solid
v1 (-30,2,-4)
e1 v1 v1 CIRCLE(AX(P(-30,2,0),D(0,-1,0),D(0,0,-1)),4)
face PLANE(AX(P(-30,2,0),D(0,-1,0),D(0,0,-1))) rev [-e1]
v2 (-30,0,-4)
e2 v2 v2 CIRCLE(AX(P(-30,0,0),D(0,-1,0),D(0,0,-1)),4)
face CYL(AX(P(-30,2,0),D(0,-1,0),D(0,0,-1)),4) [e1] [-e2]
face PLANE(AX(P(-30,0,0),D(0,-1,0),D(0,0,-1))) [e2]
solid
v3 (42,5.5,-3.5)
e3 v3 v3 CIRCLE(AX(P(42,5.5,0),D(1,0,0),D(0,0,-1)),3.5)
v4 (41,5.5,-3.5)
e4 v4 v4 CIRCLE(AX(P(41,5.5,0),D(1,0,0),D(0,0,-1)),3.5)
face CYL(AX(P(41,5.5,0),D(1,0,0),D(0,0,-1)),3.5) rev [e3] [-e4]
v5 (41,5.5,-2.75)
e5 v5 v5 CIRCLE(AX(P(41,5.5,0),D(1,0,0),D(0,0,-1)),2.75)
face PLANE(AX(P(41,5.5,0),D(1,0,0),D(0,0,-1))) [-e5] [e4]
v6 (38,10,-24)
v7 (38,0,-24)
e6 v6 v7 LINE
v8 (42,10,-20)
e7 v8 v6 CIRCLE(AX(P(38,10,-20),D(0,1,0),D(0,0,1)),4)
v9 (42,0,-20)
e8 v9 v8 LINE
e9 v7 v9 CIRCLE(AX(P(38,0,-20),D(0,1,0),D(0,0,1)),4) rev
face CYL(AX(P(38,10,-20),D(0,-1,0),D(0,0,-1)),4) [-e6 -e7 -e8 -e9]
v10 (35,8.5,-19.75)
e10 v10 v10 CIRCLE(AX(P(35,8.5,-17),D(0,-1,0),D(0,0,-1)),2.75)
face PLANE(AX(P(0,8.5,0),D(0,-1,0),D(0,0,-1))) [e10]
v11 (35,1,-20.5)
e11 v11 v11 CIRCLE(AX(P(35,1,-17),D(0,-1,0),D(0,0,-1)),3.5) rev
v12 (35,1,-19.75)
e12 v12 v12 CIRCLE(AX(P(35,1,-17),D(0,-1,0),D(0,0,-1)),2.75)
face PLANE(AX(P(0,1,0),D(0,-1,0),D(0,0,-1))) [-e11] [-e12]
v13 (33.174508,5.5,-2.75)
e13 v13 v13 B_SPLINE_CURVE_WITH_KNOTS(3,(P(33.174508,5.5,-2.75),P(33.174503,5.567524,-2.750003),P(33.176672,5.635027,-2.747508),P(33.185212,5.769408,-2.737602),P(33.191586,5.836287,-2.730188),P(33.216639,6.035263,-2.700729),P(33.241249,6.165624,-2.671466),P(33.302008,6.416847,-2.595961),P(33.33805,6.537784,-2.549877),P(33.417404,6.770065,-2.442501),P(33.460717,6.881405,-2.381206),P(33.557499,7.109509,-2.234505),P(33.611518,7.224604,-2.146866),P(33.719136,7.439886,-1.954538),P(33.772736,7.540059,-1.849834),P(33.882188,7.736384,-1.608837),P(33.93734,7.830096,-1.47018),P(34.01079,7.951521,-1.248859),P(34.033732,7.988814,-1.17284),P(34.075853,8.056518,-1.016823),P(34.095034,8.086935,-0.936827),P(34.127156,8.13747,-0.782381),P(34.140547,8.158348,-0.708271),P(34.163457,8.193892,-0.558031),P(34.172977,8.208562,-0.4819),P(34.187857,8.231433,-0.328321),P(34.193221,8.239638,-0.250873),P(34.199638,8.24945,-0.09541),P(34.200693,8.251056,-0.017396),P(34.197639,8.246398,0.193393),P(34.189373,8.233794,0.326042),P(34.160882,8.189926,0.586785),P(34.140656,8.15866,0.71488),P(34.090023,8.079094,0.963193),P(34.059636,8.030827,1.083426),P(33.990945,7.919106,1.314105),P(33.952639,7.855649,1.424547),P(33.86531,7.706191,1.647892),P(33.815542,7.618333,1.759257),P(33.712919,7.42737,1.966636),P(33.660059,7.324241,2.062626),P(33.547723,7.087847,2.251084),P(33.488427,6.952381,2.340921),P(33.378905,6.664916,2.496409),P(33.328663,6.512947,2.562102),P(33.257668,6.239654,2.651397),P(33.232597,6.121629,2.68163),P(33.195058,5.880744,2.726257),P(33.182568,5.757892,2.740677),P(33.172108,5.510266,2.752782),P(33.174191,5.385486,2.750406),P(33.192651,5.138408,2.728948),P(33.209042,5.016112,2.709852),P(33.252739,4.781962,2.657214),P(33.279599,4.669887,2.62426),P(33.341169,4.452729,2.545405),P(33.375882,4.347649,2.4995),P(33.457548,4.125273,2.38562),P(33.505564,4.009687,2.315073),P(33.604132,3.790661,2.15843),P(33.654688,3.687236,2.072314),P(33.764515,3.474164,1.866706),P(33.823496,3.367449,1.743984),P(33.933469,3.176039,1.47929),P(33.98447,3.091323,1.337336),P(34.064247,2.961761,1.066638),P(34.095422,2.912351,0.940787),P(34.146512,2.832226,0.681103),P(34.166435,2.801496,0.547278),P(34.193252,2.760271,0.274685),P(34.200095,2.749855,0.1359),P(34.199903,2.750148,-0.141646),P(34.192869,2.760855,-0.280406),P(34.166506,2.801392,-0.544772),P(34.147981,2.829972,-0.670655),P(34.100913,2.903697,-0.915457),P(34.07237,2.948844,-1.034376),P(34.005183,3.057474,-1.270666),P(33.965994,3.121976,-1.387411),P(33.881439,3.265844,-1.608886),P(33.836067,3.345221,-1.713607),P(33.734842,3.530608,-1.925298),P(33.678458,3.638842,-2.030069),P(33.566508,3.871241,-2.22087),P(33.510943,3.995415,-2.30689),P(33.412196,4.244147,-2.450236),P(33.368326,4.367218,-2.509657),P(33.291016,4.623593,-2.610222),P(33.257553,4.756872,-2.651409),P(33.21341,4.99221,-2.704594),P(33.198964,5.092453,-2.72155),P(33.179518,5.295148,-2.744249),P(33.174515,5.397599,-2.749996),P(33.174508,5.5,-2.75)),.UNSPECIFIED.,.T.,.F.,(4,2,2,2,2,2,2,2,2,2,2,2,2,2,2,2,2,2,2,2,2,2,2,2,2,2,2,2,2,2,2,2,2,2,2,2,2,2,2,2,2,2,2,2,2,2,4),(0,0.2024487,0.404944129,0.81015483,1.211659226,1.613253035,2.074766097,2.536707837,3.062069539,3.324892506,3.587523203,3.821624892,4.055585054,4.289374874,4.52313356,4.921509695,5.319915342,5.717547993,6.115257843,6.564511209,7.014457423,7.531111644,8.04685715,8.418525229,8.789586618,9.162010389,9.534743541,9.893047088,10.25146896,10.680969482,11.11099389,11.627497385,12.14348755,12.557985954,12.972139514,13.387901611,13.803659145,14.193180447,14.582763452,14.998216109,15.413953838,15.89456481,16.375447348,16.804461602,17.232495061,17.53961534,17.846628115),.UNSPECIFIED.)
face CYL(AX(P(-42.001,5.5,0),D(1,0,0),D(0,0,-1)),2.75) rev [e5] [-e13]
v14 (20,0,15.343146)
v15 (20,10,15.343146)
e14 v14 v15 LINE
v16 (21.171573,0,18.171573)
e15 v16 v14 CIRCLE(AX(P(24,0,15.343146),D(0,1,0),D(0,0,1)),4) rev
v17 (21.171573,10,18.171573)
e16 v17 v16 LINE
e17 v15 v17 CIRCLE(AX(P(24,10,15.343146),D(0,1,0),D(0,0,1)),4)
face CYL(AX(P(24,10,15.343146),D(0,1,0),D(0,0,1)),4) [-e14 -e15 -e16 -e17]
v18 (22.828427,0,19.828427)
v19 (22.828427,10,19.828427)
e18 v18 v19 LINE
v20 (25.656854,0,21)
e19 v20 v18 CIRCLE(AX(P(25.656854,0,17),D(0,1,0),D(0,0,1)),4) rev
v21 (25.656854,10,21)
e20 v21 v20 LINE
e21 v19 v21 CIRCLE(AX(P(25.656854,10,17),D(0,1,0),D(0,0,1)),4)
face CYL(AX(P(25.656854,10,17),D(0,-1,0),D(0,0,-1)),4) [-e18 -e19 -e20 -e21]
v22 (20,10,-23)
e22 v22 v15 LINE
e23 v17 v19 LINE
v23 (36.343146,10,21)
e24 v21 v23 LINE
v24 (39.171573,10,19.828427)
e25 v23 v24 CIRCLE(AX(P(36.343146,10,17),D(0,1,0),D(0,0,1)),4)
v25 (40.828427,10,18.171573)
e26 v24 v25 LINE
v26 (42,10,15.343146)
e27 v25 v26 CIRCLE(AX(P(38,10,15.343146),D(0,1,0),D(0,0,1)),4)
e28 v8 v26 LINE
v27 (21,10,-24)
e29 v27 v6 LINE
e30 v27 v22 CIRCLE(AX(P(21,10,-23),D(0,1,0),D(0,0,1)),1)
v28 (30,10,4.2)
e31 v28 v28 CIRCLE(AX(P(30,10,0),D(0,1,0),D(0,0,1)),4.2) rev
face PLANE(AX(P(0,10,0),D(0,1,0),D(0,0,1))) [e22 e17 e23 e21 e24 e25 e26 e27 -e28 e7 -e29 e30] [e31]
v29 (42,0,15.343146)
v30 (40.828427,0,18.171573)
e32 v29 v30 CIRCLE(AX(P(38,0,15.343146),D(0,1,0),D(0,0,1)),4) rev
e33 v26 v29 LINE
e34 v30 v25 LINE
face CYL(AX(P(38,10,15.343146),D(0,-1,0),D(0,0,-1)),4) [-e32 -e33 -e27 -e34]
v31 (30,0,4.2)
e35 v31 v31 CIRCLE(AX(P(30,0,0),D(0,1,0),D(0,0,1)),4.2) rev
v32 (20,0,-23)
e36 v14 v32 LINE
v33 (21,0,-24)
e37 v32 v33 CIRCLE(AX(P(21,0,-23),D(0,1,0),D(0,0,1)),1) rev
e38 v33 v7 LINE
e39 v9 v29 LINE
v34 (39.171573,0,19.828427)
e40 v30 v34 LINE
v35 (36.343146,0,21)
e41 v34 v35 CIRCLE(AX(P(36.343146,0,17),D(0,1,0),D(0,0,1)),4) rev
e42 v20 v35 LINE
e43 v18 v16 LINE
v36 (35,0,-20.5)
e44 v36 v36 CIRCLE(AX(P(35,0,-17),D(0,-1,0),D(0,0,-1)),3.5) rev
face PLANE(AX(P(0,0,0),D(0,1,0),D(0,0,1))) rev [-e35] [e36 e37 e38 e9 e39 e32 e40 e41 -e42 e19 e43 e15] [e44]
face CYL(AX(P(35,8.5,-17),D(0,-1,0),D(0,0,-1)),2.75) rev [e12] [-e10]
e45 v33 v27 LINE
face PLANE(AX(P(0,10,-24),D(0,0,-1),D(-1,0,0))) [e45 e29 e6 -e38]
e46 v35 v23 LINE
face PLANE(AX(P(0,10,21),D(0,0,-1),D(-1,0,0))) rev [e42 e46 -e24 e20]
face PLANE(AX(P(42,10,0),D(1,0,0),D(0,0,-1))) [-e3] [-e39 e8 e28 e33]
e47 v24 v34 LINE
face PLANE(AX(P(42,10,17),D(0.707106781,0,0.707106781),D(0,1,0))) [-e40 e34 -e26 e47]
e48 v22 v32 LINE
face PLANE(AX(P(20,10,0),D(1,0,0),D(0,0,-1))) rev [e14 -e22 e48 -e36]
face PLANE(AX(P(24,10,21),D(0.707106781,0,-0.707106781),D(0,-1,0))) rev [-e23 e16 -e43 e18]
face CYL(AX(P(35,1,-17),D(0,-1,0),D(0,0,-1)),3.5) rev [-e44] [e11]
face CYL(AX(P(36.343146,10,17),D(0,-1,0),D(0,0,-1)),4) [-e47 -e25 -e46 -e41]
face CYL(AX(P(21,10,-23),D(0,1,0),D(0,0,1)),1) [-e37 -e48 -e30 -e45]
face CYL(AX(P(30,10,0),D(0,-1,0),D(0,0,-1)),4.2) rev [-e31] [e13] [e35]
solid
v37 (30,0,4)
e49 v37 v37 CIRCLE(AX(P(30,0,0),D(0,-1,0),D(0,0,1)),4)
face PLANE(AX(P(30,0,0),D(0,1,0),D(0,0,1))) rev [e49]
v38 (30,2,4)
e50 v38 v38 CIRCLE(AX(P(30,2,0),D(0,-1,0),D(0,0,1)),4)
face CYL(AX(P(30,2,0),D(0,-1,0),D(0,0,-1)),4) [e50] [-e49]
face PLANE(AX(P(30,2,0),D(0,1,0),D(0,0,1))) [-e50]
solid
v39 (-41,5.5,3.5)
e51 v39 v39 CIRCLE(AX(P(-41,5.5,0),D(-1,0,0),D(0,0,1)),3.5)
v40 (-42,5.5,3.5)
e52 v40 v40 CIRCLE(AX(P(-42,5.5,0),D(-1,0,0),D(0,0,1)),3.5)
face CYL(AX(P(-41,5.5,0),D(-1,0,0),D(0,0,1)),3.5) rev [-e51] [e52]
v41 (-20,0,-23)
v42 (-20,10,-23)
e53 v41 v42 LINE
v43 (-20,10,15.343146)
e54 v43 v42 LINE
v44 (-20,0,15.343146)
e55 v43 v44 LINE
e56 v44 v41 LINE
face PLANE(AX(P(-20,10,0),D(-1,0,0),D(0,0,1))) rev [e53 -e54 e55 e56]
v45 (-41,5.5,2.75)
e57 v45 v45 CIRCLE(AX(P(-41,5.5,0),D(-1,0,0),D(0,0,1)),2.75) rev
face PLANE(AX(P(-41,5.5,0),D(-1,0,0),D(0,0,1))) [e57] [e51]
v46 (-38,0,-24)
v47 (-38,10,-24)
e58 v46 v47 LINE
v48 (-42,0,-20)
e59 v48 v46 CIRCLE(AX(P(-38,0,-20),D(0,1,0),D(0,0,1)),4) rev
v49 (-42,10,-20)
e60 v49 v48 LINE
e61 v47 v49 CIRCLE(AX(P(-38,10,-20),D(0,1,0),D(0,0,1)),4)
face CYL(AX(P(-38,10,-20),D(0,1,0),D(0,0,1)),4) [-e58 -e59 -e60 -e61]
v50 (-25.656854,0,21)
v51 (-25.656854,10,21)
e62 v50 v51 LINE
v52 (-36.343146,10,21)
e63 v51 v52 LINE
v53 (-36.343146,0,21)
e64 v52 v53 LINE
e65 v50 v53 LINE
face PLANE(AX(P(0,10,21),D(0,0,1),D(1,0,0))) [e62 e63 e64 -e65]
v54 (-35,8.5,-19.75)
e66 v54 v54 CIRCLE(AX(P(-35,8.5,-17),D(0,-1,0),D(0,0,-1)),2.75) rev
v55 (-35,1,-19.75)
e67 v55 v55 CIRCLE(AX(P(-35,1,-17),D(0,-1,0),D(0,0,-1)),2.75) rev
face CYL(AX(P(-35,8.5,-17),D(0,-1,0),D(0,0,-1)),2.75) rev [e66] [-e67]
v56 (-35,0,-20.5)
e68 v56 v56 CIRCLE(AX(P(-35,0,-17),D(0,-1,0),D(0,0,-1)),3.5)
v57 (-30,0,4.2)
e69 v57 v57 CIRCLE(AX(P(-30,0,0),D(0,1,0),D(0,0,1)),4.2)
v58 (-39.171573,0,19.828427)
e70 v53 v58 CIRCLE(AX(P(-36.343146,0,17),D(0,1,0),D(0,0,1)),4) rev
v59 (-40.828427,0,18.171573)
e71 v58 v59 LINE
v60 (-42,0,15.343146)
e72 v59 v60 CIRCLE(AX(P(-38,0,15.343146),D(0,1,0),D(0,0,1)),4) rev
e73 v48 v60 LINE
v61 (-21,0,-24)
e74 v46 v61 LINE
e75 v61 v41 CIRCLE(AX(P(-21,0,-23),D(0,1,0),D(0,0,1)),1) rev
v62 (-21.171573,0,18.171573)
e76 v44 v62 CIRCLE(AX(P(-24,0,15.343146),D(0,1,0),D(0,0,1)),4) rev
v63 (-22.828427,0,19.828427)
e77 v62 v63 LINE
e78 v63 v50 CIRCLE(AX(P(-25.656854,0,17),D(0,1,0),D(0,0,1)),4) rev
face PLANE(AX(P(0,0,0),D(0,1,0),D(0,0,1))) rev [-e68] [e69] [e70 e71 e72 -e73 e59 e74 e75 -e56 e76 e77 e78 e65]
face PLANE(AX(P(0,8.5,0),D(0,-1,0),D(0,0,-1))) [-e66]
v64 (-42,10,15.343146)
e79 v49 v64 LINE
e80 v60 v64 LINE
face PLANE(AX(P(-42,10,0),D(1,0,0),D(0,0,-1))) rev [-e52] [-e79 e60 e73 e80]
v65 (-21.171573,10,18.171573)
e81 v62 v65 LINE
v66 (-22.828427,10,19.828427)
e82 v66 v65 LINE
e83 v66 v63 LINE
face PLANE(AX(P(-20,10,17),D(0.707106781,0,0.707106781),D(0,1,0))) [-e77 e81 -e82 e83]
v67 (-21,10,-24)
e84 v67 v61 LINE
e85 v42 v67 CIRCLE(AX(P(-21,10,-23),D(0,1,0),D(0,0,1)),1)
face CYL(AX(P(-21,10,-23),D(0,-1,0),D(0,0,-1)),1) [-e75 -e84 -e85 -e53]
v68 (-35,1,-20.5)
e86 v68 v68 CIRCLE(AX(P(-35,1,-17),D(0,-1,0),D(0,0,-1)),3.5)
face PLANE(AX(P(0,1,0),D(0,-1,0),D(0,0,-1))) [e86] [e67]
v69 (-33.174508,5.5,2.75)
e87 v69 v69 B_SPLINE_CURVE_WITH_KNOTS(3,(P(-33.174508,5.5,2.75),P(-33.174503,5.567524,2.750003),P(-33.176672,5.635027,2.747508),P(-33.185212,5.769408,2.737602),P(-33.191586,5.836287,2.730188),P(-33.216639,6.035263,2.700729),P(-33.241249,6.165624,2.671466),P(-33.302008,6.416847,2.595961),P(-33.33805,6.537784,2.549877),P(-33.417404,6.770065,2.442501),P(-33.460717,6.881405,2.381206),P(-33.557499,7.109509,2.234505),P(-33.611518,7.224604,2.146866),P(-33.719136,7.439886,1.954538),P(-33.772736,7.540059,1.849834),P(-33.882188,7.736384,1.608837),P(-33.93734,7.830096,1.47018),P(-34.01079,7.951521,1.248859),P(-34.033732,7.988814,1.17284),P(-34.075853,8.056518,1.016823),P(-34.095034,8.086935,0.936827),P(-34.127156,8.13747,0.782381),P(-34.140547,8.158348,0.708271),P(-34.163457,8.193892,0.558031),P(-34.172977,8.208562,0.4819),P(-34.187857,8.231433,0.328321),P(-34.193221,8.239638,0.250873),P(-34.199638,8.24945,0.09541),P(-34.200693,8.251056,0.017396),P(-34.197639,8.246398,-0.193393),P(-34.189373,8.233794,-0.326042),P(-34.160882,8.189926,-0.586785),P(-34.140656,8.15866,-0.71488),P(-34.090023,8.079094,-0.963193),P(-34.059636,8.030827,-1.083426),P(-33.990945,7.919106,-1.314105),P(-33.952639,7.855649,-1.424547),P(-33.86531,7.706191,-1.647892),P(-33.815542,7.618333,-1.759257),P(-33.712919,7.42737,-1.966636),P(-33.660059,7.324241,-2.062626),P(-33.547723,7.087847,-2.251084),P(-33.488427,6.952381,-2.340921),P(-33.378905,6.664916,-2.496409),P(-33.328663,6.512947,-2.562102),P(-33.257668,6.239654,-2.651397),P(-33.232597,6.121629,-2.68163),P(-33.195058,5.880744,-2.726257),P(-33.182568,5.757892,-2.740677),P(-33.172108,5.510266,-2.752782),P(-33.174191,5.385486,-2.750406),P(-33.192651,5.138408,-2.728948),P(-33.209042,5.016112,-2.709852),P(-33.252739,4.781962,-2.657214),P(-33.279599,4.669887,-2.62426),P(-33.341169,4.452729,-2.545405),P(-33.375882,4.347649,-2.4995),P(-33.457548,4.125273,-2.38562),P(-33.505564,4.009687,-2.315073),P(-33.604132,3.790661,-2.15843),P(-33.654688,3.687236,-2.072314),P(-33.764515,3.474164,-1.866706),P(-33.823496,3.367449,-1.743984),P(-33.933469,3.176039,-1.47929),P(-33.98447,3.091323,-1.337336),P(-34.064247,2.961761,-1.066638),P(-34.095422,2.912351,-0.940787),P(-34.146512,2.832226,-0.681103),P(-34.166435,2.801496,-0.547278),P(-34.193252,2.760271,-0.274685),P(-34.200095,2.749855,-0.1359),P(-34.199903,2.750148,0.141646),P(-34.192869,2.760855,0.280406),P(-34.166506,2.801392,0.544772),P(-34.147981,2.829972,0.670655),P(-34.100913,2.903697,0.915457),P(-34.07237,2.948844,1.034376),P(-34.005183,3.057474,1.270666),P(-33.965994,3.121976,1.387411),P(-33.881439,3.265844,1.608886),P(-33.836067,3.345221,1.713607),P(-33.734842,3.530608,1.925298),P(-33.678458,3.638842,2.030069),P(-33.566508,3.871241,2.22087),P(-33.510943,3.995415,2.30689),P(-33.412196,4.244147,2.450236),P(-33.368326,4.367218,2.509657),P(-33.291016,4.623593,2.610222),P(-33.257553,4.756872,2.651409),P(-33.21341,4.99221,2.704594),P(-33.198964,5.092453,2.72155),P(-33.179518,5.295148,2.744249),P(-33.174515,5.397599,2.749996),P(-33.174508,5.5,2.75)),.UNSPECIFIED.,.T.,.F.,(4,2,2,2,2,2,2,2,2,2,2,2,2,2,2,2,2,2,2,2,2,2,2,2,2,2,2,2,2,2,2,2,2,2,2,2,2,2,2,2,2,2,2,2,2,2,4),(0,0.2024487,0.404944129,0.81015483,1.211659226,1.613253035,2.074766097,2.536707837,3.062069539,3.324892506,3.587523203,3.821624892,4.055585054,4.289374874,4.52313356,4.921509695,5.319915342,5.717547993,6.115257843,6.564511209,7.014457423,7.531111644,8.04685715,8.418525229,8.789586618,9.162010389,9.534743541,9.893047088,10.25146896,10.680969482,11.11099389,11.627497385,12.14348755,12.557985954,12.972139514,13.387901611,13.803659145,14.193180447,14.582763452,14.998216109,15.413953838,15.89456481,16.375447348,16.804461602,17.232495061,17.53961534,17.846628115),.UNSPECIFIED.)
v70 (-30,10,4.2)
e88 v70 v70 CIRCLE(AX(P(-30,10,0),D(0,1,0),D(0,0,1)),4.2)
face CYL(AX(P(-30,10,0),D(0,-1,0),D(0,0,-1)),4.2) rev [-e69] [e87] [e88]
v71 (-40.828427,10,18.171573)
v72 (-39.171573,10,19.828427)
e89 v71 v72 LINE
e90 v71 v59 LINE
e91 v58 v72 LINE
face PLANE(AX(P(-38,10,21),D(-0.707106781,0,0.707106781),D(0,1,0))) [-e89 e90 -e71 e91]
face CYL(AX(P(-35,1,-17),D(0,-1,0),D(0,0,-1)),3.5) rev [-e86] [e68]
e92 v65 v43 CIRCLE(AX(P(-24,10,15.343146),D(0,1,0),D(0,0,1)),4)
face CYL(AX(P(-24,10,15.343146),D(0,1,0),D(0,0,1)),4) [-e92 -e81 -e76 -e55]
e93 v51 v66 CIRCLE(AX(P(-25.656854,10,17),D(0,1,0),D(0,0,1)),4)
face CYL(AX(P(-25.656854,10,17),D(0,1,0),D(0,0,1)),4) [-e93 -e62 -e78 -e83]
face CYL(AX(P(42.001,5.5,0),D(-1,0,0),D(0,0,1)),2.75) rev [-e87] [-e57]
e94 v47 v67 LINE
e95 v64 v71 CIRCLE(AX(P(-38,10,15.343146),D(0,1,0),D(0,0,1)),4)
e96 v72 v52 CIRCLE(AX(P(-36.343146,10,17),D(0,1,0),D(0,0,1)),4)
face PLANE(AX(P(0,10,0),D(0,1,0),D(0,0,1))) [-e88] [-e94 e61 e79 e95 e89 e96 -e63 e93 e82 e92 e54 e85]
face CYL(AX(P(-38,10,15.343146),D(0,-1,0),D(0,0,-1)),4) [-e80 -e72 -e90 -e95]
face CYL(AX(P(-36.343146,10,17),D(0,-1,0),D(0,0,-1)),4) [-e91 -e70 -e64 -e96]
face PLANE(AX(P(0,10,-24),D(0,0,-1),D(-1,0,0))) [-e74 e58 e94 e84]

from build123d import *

# Parameters (mm, degrees)
ESQUISSE1_R                 = 4.2
BOSS_EXTRU_1_DEPTH          = 10
CHANFREIN3_SIZE             = 4
CONG_2_R                    = 4
ESQUISSE3_R                 = 4
BOSS_EXTRU_2_DEPTH          = 2
BOSS_EXTRU_2_2_DEPTH        = 2
ENL_V_START                 = -42
ENL_V_MAT_EXTRU_4_OUTLINE_R = 2.75
ENL_V_MAT_EXTRU_4_DEPTH     = 8.825492271
CONG_4_R                    = 4
ESQUISSE7_R                 = 2.75
ENL_V_MAT_EXTRU_5_DEPTH     = 8.5
ESQUISSE7_4_R               = 3.5
ESQUISSE7_4_R_2             = 2.75
ENL_V_MAT_EXTRU_8_DEPTH     = 1
ESQUISSE8_R                 = 3.5
ENL_V_MAT_EXTRU_9_DEPTH     = 1
ENL_V_START_2               = -1
ESQUISSE9_R                 = 3.5
ENL_V_MAT_EXTRU_10_DEPTH    = 1
ESQUISSE10_W                = 40
ESQUISSE10_H                = 50.736146746
ENL_V_MAT_EXTRU_11_DEPTH    = 10
CONG_5_R                    = 1
CONG_6_R                    = 1


# Read off the part's stored shape, not the designer's step: Enlèv. mat.-Extru.4
with BuildPart() as part:
    # Esquisse1 → Boss.-Extru.1 (new body)
    # profile 1 of 4: a face of its own
    with BuildSketch(Plane(origin=(0, 0, 0), x_dir=(1, 0, 0), z_dir=(0, 1, 0))):
        Polygon((-20, 10.5), (-20, 16), (-20, 17.5), (-15, 17.5), (0, 17.5), (0, 24), (-42, 24), (-42, 16), (-42, 0), (-42, -21), (-20, -21), align=None)
        with Locations(Location((-30, 0, 0), (0, 0, 270))):
            Circle(ESQUISSE1_R, mode=Mode.SUBTRACT)
    # profile 2 of 4: a face of its own
    with BuildSketch(Plane(origin=(0, 0, 0), x_dir=(1, 0, 0), z_dir=(0, 1, 0))):
        Polygon((0, 24), (0, 17.5), (15, 17.5), (20, 17.5), (20, 16), (20, 10.5), (20, -21), (42, -21), (42, 0), (42, 16), (42, 24), align=None)
        with Locations(Location((30, 0, 0), (0, 0, 270))):
            Circle(ESQUISSE1_R, mode=Mode.SUBTRACT)
    # profile 3 of 4: a face of its own
    with BuildSketch(Plane(origin=(0, 0, 0), x_dir=(1, 0, 0), z_dir=(0, 1, 0))):
        Polygon((-20, 17.5), (-20, 16), (-20, 10.5), (-15, 17.5), align=None)
    # profile 4 of 4: a face of its own
    with BuildSketch(Plane(origin=(0, 0, 0), x_dir=(1, 0, 0), z_dir=(0, 1, 0))):
        Polygon((20, 17.5), (15, 17.5), (20, 10.5), (20, 16), align=None)
    extrude(amount=BOSS_EXTRU_1_DEPTH)

    # Chanfrein3
    chanfrein3_edges = [part.edges().sort_by_distance(p)[0] for p in [
        (-20, 5, 21),
        (-42, 5, 21),
        (42, 5, 21),
        (20, 5, 21),
    ]]
    chamfer(chanfrein3_edges, length=CHANFREIN3_SIZE)

    # Congé2
    cong_2_edges = [part.edges().sort_by_distance(p)[0] for p in [
        (42, 5, 17),
        (24, 5, 21),
        (38, 5, 21),
        (20, 5, 17),
        (-24, 5, 21),
        (-38, 5, 21),
        (-42, 5, 17),
        (-20, 5, 17),
    ]]
    fillet(cong_2_edges, radius=CONG_2_R)

    # Enlèv. mat.-Extru.4 outline → Enlèv. mat.-Extru.4 (cut)
    with BuildSketch(Plane.YZ.offset(ENL_V_START)):
        with Locations((5.5, 0)):
            Circle(ENL_V_MAT_EXTRU_4_OUTLINE_R)
    enl_v_mat_extru_4 = extrude(amount=ENL_V_MAT_EXTRU_4_DEPTH, mode=Mode.SUBTRACT)

    # Symétrie10: Enlèv. mat.-Extru.4 across plane
    add(enl_v_mat_extru_4.mirror(Plane(origin=(0, 0, 0), x_dir=(0, 0, 1), z_dir=(1, 0, 0))), mode=Mode.SUBTRACT)

    # Congé4
    cong_4_edges = [part.edges().sort_by_distance(p)[0] for p in [
        (-42, 5, -24),
        (42, 5, -24),
        (20, 5, -10.5),
        (15, 5, -17.5),
        (-15, 5, -17.5),
        (-20, 5, -10.5),
    ]]
    fillet(cong_4_edges, radius=CONG_4_R)

    # Esquisse7 → Enlèv. mat.-Extru.5 (cut)
    with BuildSketch(Plane.XZ):
        with Locations(Location((-35, -17, 0), (0, 0, 270))):
            Circle(ESQUISSE7_R)
        with Locations(Location((35, -17, 0), (0, 0, 270))):
            Circle(ESQUISSE7_R)
    extrude(amount=-ENL_V_MAT_EXTRU_5_DEPTH, mode=Mode.SUBTRACT)

    # Esquisse7<4> → Enlèv. mat.-Extru.8 (cut)
    # profile 1 of 2: a face of its own
    with BuildSketch(Plane.XZ):
        with Locations(Location((-35, -17, 0), (0, 0, 270))):
            Circle(ESQUISSE7_4_R)
        with Locations(Location((-35, -17, 0), (0, 0, 270))):
            Circle(ESQUISSE7_4_R_2, mode=Mode.SUBTRACT)
    # profile 2 of 2: a face of its own
    with BuildSketch(Plane.XZ):
        with Locations(Location((35, -17, 0), (0, 0, 270))):
            Circle(ESQUISSE7_4_R)
        with Locations(Location((35, -17, 0), (0, 0, 270))):
            Circle(ESQUISSE7_4_R_2, mode=Mode.SUBTRACT)
    extrude(amount=-ENL_V_MAT_EXTRU_8_DEPTH, mode=Mode.SUBTRACT)

    # Esquisse8 → Enlèv. mat.-Extru.9 (cut)
    with BuildSketch(Plane.ZY.offset(42)):
        with Locations((0, 5.5)):
            Circle(ESQUISSE8_R)
    extrude(amount=-ENL_V_MAT_EXTRU_9_DEPTH, mode=Mode.SUBTRACT)

    # Esquisse9 → Enlèv. mat.-Extru.10 (cut)
    with BuildSketch(Plane(origin=(42, 0, 0), x_dir=(0, 0, -1), z_dir=(1, 0, 0)).offset(ENL_V_START_2)):
        with Locations(Location((0, 5.5, 0), (0, 0, 180))):
            Circle(ESQUISSE9_R)
    extrude(amount=ENL_V_MAT_EXTRU_10_DEPTH, mode=Mode.SUBTRACT)

    # Esquisse10 → Enlèv. mat.-Extru.11 (cut)
    with BuildSketch(Plane(origin=(0, 10, 0), x_dir=(1, 0, 0), z_dir=(0, 1, 0))):
        Rectangle(ESQUISSE10_W, ESQUISSE10_H)
    extrude(amount=-ENL_V_MAT_EXTRU_11_DEPTH, mode=Mode.SUBTRACT)


with BuildPart() as body_2:
    # Esquisse3 → Boss.-Extru.2 (new body)
    with BuildSketch(Plane.XZ):
        with Locations(Location((-30, 0, 0), (0, 0, 270))):
            Circle(ESQUISSE3_R)
    extrude(amount=-BOSS_EXTRU_2_DEPTH)


with BuildPart() as body_3:
    # Esquisse3 → Boss.-Extru.2 2 (new body)
    with BuildSketch(Plane.XZ):
        with Locations(Location((30, 0, 0), (0, 0, 90))):
            Circle(ESQUISSE3_R)
    extrude(amount=-BOSS_EXTRU_2_2_DEPTH)


with BuildPart() as enl_v_mat_extru_11_piece_1:
    # of the separate pieces the step leaves, piece 1, a body of its own (enl_v_mat_extru_11_pieces)
    add(part.part.solids().sort_by_distance((-42, 0, -20))[0])

    # Congé5
    cong_5_edges = [enl_v_mat_extru_11_piece_1.edges().sort_by_distance(p)[0] for p in [
        (-20, 5, -24),
    ]]
    fillet(cong_5_edges, radius=CONG_5_R)


with BuildPart() as enl_v_mat_extru_11_piece_2:
    # of the separate pieces the step leaves, piece 2, a body of its own (enl_v_mat_extru_11_pieces)
    add(part.part.solids().sort_by_distance((20, 0, -24))[0])

    # Congé6
    cong_6_edges = [enl_v_mat_extru_11_piece_2.edges().sort_by_distance(p)[0] for p in [
        (20, 5, -24),
    ]]
    fillet(cong_6_edges, radius=CONG_6_R)


solid = Compound([body_2.part, body_3.part, enl_v_mat_extru_11_piece_1.part, enl_v_mat_extru_11_piece_2.part])
